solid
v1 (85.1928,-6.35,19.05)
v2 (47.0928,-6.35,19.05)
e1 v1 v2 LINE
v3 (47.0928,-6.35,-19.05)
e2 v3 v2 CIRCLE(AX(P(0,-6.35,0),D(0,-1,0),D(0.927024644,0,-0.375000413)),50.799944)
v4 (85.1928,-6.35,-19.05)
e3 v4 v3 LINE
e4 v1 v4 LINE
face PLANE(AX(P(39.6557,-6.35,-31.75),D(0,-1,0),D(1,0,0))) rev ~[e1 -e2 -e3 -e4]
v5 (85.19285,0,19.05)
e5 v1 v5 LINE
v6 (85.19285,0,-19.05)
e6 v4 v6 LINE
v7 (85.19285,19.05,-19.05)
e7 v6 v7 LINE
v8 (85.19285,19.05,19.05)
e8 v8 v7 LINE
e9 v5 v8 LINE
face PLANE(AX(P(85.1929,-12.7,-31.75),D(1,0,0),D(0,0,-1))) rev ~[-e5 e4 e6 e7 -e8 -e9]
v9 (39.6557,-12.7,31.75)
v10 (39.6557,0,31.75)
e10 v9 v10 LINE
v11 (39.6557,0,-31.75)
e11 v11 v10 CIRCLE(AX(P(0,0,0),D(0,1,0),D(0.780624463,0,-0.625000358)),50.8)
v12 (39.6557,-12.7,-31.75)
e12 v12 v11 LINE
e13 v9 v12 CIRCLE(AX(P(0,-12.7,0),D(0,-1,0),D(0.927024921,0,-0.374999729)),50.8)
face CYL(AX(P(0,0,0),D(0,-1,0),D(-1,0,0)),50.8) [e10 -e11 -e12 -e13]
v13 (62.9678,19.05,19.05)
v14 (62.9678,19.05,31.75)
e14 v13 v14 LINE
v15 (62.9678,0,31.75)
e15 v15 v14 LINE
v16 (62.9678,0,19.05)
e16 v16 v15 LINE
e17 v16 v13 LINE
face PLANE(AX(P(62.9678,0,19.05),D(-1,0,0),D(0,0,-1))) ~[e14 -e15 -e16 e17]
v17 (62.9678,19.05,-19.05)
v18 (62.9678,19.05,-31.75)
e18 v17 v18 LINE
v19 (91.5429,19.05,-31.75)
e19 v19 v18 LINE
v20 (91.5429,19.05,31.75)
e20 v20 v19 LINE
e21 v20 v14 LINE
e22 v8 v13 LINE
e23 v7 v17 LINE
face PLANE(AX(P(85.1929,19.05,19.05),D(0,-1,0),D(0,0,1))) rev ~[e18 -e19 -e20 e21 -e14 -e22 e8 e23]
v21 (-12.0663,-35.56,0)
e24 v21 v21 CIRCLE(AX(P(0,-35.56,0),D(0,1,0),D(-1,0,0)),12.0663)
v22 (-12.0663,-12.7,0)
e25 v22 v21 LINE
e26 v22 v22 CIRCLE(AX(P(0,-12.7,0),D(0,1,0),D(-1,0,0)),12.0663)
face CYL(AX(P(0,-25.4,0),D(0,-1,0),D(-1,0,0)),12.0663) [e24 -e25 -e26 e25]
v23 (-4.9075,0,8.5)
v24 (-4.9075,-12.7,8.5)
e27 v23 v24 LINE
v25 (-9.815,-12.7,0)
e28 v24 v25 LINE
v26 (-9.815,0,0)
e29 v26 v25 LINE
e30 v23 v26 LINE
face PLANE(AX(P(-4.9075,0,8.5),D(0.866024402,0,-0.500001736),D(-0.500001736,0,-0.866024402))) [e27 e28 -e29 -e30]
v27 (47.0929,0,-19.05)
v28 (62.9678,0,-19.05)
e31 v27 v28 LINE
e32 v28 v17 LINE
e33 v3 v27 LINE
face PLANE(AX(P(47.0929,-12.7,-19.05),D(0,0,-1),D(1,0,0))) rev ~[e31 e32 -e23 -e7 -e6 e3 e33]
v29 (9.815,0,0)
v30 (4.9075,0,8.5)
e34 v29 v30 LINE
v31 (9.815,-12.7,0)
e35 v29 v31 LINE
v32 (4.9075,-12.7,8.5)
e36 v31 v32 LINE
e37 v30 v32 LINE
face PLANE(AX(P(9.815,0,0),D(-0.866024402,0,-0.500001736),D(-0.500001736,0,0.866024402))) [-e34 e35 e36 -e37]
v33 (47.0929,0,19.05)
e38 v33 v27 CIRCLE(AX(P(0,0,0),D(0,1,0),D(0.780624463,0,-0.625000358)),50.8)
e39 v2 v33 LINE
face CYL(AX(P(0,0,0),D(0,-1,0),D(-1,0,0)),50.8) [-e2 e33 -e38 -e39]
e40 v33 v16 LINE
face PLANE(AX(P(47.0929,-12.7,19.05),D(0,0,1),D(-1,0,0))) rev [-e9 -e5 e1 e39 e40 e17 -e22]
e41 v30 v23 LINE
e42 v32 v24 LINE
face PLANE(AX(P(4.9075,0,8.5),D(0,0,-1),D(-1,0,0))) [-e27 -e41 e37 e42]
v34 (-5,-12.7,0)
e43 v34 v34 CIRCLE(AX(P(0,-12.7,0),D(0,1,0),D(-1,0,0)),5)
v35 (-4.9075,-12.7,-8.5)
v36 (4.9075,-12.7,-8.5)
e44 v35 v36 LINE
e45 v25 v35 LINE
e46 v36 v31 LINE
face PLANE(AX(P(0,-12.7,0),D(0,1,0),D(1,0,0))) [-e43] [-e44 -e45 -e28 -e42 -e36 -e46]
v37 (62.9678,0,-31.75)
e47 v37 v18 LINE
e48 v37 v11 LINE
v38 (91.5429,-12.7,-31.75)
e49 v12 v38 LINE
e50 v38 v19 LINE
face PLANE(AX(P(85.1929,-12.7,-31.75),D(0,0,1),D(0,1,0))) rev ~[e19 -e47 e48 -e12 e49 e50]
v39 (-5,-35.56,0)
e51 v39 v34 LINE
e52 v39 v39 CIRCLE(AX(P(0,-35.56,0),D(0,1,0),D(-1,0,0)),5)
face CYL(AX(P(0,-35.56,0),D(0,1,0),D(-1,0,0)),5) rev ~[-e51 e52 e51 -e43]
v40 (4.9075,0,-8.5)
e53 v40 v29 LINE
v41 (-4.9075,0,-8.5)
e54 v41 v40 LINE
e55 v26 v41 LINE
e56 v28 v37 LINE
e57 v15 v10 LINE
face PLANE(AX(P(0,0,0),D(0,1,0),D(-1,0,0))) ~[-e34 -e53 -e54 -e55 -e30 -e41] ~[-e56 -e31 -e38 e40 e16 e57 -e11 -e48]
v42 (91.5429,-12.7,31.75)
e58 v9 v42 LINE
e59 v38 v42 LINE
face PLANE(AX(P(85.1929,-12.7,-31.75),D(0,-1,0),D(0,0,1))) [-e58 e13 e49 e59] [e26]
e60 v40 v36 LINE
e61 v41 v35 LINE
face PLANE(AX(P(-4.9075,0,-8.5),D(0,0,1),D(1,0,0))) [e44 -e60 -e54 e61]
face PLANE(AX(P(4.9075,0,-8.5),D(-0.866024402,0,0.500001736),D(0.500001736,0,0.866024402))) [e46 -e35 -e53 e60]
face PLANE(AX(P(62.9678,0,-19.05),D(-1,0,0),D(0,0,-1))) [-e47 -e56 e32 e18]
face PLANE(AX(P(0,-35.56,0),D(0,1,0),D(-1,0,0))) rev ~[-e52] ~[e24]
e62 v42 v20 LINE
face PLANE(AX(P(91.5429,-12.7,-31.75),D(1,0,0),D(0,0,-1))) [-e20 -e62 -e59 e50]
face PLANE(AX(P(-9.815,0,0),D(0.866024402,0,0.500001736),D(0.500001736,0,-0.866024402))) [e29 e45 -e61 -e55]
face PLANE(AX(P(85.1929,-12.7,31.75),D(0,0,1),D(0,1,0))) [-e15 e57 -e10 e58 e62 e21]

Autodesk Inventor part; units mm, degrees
ref_plane "YZ Plane" through (0, 0, 0) normal (1, 0, 0) x (0, 1, 0)
ref_plane "XZ Plane" through (0, 0, 0) normal (0, 1, 0) x (-1, 0, 0)
ref_plane "XY Plane" through (0, 0, 0) normal (0, 0, 1) x (1, 0, 0)
sketch "Sketch1" plane through (0, 0, 0) normal (0, 0, 1) x (1, 0, 0)
  line L0 (0, 0) -> (-50.8, 0)
  line L1 (-50.8, 0) -> (-50.8, -12.7)
  line L2 (-50.8, -12.7) -> (-38.1, -12.7)
  line L3 (-12.0663, -25.4) -> (-12.0663, -35.56)
  line L4 (-5, -35.56) -> (-5, -4.064)
  line L5 (-5, -4.064) -> (0, -4.064)
  line L6 (0, -4.064) -> (0, 0)
  line L7 (-12.0663, -35.56) -> (-5, -35.56)
  line L8 (-38.1, -12.7) -> (-12.0663, -12.7)
  line L9 (-12.0663, -12.7) -> (-12.0663, -25.4)
  dimension "d0" = 50.8
  dimension "d1" = 5
  dimension "d2" = 12.0663
  dimension "d13" = 22.86
  dimension "d15" = 31.496
revolve "Revolution1" add sketch "Sketch1" angle 360 about axis through (0, -4.064, 0) along (0, 1, 0)
sketch "Sketch5" plane through (0, 0, 0) normal (0, 1, 0) x (1, 0, 0)
  circle A0 centre (0, 0) radius 5 projected
  line L0 (9.815, 0) -> (4.9075, -8.5)
  line L1 (4.9075, -8.5) -> (-4.9075, -8.5)
  line L2 (-4.9075, -8.5) -> (-9.815, 0)
  line L3 (-9.815, 0) -> (-4.9075, 8.5)
  line L4 (-4.9075, 8.5) -> (4.9075, 8.5)
  line L5 (4.9075, 8.5) -> (9.815, 0)
  point P0 (0, 0)
  point P1 (0, 0)
  dimension "d16" = 17
extrude "Extrusion1" cut sketch "Sketch5" against normal blind 12.7 contours A0 | L0 L1 L2 L3 L4 L5
sketch "Sketch7" plane through (0, -12.7, 0) normal (0, -1, 0) x (1, 0, 0)
  circle A0 centre (0, 0) radius 50.8 projected
  line L0 (47.0929, -19.05) -> (85.1929, -19.05)
  line L1 (85.1929, -19.05) -> (85.1929, -31.75)
  line L2 (85.1929, -31.75) -> (39.6557, -31.75)
  circle A1 centre (0, 0) radius 5 construction
  line L3 (0, 0) -> (5, 0) construction
  line L4 (50.8, 0) -> (83.823, 0) construction
  dimension "d23" = 38.1
  dimension "d24" = 12.7
  dimension "d25" = 19.05
extrude "Extrusion3" add sketch "Sketch7" against normal blind 12.7 contours A0 L0 L1 L2
sketch "Sketch8" plane through (39.6557, 0, -31.75) normal (0, 1, 0) x (1, 0, 0)
  line L0 (45.5371, -12.7) -> (45.5371, 0) projected
  line L1 (45.5371, 0) -> (0, 0) projected
  line L2 (7.4371, -12.7) -> (45.5371, -12.7) projected
  line L3 (35.8511, -107.95) -> (35.8511, 44.45)
  line L4 (26.3261, -107.95) -> (26.3261, 44.45)
  line L5 (45.5371, -12.7) -> (23.3121, -12.7)
  line L6 (23.3121, -12.7) -> (23.3121, 0)
  line L7 (23.3121, 0) -> (45.5371, 0)
  line L8 (45.5371, 0) -> (45.5371, -12.7)
  point P0 (-39.6557, -31.75)
  point P1 (23.3121, 0)
  point P2 (23.3121, -12.7)
  dimension "d28" = 22.225
extrude "Extrusion4" add sketch "Sketch8" along normal blind 19.05
sketch "Sketch9" plane through (85.1929, -12.7, -31.75) normal (0, 0, -1) x (-1, 0, 0)
  line L0 (22.225, 12.7) -> (22.225, 31.75) projected
  line L1 (0, 31.75) -> (22.225, 31.75) projected
  arc A0 (38.6742, 14.3599) -> (35.4992, 14.3599) centre (37.0867, 18.85) ccw projected
  line L2 (0, 0) -> (0, 31.75) projected
  circle A1 centre (37.0867, 18.85) radius 4.953
  point P0 (85.1929, 12.7)
  dimension "d31" = 9.906
extrude "Extrusion5" cut sketch "Sketch9" against normal through all
mirror "Mirror1" about plane through (0, 0, 0) normal (0, 0, 1) of "Extrusion4", "Extrusion5", "Extrusion3"
sketch "Sketch10" plane through (39.6557, -12.7, -31.75) normal (0, -1, 0) x (1, 0, 0)
  arc A0 (7.4371, 12.7) -> (7.4371, 50.8) centre (-39.6557, 31.75) ccw projected
  line L0 (45.5371, 50.8) -> (7.4371, 50.8) projected
  line L1 (45.5371, 12.7) -> (7.4371, 12.7) projected
  arc A1 (7.4371, 12.7) -> (7.4371, 50.8) centre (-39.6557, 31.75) ccw
  line L2 (7.4371, 50.8) -> (45.5371, 50.8)
  line L3 (45.5371, 0) -> (45.5371, 12.7) projected
  line L4 (45.5371, 50.8) -> (45.5371, 12.7)
  line L5 (45.5371, 12.7) -> (7.4371, 12.7)
extrude "Extrusion6" add sketch "Sketch10" against normal blind 6.35
sketch "Sketch11" plane through (85.1929, -12.7, -31.75) normal (1, 0, 0) x (0, 0, -1)
  line L0 (-63.5, 0) -> (-63.5, 31.75) projected
  line L1 (-50.8, 31.75) -> (-63.5, 31.75) projected
  line L2 (-12.7, 31.75) -> (0, 31.75) projected
  line L3 (0, 0) -> (0, 31.75) projected
  line L4 (0, 0) -> (-63.5, 0) projected
  line L5 (-63.5, 31.75) -> (0, 31.75)
  line L6 (0, 31.75) -> (0, 0)
  line L7 (0, 0) -> (-63.5, 0)
  line L8 (-63.5, 0) -> (-63.5, 31.75)
  point P0 (-31.75, 12.7)
  point P1 (-12.7, 31.75)
  point P2 (-50.8, 31.75)
extrude "Extrusion7" add sketch "Sketch11" along normal blind 6.35
sketch "Sketch12" plane through (39.6557, 19.05, -31.75) normal (0, 1, 0) x (1, 0, 0)
  point P0 (-39.6557, -31.75)
equation "\"d0\" = topPartRadius"
equation "\"d2\" = stemRadius"
equation "\"d13\" = stemHeight"
equation "\"d15\" = internalHoleDepth"
equation "\"topPartRadius\" = 0.5 * topPartDiameter"
equation "\"totalHeight\" = 35.56"
equation "\"stemRadius\" = 12.06627"
equation "\"stemHeight\" = 22.86"
equation "\"internalHoleDepth\" = 31.496"
equation "\"topPartDiameter\" = 101.6"
properties part number "celestronTripodAdapter" material "PC/ABS Plastic"
